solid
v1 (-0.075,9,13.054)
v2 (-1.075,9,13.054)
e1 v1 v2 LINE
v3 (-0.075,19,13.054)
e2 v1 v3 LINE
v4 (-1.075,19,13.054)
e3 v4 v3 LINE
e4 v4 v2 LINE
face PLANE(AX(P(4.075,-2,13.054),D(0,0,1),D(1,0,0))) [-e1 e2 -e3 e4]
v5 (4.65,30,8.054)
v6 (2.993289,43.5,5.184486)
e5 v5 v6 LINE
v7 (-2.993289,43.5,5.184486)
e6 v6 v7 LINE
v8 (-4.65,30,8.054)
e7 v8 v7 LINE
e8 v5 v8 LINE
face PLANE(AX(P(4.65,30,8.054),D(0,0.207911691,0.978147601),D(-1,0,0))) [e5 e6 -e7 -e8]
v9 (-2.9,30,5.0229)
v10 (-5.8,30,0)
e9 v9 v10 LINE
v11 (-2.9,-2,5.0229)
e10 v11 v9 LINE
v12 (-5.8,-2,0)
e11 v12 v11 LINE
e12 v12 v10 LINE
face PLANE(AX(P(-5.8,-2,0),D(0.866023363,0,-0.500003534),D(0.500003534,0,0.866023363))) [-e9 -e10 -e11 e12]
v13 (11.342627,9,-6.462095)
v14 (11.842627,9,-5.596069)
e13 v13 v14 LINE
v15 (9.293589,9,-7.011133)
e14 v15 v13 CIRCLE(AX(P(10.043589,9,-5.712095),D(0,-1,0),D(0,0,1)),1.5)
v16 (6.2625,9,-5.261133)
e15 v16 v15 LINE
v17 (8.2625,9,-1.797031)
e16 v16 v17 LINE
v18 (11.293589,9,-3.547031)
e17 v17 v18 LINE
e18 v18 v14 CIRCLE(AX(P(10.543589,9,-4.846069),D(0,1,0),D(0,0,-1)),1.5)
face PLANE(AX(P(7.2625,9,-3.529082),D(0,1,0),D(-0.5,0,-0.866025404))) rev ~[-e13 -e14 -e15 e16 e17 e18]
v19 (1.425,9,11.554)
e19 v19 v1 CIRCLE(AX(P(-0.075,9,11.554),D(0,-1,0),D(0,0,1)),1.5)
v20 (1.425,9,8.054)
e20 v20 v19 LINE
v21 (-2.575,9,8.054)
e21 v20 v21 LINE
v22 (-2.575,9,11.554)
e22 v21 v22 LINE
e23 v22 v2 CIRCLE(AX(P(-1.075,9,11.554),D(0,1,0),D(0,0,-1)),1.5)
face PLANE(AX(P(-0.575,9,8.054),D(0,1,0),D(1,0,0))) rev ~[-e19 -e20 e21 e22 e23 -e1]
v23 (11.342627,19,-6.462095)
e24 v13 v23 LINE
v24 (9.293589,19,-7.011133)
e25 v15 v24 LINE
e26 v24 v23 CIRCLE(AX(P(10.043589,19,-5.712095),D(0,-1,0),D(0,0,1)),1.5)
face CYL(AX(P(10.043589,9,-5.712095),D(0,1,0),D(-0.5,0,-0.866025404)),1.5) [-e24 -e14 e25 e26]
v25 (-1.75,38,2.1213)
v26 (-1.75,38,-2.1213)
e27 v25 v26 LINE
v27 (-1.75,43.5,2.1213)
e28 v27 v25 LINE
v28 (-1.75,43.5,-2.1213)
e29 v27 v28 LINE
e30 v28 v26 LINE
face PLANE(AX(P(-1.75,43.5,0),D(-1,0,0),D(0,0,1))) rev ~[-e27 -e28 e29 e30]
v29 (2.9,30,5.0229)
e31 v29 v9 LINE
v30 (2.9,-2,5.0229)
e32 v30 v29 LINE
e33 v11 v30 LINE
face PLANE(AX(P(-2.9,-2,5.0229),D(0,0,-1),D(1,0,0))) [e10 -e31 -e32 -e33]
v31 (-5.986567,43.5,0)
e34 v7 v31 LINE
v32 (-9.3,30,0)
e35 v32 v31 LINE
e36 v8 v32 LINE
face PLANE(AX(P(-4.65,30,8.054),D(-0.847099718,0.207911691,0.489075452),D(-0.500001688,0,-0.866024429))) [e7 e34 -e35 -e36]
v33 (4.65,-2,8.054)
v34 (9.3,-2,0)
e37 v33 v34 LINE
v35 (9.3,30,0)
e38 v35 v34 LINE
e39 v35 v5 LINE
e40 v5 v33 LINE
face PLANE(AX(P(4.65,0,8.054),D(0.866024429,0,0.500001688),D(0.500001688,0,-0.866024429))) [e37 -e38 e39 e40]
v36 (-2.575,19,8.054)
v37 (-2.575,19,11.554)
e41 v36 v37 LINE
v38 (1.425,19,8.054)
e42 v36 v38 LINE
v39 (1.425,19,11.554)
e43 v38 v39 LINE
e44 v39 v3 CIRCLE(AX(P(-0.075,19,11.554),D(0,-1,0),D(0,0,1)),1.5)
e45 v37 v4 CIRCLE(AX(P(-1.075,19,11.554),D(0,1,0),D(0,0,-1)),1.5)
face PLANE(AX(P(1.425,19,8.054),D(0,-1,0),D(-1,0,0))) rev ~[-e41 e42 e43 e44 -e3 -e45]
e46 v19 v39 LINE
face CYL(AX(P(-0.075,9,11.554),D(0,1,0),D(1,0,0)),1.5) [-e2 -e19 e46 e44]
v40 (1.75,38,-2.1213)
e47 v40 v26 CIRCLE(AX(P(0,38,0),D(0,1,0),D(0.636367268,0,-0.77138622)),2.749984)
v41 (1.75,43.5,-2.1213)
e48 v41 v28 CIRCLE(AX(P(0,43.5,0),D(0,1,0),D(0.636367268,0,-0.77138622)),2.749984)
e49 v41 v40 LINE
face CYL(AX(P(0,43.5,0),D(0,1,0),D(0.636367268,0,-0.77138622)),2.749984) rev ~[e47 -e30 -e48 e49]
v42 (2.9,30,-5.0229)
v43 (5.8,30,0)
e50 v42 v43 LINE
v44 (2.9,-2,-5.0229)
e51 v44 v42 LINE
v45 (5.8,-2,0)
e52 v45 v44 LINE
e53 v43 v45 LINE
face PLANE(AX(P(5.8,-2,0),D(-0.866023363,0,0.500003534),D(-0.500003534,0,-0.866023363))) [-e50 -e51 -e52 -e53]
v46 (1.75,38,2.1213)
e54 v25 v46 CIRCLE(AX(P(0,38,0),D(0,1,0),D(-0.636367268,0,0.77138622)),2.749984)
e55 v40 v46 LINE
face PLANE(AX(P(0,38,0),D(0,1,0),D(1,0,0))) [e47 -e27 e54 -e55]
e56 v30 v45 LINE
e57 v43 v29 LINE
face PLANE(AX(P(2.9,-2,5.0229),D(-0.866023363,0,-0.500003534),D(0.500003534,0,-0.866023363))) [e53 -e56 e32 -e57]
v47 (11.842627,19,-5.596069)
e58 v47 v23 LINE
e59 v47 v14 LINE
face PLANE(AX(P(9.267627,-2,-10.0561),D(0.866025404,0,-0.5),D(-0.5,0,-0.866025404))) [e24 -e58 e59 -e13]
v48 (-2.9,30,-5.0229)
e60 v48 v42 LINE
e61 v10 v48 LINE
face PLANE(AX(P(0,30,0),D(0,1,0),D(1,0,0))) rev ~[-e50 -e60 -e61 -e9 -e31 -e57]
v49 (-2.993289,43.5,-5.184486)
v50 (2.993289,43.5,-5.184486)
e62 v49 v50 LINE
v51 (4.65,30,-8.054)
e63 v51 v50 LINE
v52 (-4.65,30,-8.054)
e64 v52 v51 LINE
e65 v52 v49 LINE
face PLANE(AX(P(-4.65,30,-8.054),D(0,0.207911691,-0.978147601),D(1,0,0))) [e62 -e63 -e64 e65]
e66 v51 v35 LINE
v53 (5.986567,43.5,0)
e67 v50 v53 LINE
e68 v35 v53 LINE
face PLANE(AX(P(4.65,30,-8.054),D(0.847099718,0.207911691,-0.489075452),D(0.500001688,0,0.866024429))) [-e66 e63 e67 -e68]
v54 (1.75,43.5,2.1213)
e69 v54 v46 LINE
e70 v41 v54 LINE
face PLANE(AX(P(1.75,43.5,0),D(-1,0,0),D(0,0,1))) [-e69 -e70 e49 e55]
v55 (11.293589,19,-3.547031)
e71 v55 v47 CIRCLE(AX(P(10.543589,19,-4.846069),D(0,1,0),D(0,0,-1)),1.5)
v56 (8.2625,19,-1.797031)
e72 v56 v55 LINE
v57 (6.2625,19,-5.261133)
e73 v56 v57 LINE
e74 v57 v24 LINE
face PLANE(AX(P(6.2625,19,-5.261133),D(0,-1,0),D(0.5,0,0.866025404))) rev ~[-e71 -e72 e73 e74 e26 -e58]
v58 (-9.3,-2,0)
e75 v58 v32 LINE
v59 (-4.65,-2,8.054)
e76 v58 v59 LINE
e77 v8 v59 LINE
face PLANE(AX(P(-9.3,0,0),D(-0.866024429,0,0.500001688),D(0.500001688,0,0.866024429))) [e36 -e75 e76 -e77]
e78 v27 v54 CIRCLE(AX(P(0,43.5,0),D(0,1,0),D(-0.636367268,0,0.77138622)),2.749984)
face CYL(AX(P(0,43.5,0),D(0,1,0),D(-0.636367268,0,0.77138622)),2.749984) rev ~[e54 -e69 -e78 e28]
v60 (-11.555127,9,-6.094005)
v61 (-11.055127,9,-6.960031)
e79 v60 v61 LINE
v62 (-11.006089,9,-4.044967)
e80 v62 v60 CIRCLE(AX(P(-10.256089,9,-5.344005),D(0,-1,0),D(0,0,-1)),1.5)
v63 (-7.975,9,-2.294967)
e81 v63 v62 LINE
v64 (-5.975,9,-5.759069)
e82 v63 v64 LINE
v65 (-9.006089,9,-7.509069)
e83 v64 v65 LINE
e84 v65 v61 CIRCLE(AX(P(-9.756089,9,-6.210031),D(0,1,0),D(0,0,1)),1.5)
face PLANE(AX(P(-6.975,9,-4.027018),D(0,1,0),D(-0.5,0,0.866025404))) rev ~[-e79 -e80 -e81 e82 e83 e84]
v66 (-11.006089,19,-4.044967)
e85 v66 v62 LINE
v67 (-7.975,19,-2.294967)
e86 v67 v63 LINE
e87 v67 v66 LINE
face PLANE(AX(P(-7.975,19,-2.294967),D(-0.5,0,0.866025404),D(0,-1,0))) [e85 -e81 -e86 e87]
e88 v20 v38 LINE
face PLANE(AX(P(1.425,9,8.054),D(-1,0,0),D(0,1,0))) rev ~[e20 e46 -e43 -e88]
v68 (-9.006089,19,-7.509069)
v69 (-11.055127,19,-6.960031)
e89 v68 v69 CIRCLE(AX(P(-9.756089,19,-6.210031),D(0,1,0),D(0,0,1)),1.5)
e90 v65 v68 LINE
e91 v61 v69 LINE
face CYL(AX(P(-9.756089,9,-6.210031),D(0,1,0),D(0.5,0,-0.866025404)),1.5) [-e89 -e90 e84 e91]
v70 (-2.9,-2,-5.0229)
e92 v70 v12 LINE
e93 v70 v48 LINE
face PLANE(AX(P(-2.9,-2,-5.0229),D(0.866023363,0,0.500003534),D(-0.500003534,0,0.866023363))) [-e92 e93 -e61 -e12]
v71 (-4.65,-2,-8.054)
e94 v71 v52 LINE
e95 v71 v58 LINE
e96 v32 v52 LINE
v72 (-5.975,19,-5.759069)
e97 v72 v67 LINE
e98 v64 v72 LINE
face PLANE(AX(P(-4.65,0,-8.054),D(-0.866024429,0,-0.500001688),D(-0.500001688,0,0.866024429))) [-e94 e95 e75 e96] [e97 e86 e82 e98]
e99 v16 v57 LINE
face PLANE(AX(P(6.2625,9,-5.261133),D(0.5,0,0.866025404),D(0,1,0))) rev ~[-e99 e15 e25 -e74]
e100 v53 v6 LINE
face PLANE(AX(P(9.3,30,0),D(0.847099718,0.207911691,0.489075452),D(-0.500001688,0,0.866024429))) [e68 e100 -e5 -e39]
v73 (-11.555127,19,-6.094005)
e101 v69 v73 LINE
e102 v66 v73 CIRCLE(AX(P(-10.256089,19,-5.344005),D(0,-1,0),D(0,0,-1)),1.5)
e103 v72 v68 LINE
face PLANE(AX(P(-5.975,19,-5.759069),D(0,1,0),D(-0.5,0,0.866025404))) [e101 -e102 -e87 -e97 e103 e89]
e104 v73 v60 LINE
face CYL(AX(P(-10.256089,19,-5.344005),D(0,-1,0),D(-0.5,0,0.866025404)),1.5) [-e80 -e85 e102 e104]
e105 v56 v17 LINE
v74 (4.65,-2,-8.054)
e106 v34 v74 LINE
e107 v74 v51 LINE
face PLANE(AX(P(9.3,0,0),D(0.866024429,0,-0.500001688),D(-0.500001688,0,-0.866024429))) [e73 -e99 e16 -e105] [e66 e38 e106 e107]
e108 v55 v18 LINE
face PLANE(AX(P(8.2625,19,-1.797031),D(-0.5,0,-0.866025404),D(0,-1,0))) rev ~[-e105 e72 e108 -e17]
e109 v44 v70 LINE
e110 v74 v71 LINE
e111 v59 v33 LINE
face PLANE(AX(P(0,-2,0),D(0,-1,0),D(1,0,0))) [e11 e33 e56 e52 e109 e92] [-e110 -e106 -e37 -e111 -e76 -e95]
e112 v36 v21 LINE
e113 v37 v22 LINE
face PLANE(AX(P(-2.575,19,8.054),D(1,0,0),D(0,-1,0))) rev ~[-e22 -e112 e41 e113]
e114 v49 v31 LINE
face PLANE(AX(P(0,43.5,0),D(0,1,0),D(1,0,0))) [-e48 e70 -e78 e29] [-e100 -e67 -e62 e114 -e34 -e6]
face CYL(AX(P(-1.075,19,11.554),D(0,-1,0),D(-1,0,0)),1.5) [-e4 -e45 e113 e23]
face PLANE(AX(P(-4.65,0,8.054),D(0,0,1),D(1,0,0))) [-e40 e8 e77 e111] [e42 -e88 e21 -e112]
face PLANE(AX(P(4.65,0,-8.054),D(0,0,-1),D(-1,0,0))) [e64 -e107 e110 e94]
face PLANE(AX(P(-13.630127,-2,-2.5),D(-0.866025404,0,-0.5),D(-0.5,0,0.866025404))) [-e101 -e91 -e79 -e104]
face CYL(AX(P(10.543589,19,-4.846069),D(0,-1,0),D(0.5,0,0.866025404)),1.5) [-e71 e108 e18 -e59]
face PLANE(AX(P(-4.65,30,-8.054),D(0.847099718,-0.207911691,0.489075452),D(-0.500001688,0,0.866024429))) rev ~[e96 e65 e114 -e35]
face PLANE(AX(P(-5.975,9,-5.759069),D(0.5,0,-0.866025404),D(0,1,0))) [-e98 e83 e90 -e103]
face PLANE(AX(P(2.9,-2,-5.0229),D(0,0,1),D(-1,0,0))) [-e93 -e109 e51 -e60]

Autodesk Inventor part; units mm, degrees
ref_plane "YZ Plane" through (0, 0, 0) normal (1, 0, 0) x (0, 1, 0)
ref_plane "XZ Plane" through (0, 0, 0) normal (0, 1, 0) x (-1, 0, 0)
ref_plane "XY Plane" through (0, 0, 0) normal (0, 0, 1) x (1, 0, 0)
sketch "Boceto1" plane through (0, 0, 0) normal (0, 1, 0) x (-1, 0, 0)
  line L0 (0, 0) -> (5.8, 0)
  line L1 (5.8, 0) -> (9.3, 0)
  line L2 (5.8, 0) -> (2.9, -5.0229)
  line L3 (2.9, -5.0229) -> (-2.9, -5.0229)
  line L4 (-2.9, -5.0229) -> (-5.8, 0)
  line L5 (-5.8, 0) -> (-2.9, 5.0229)
  line L6 (-2.9, 5.0229) -> (2.9, 5.0229)
  line L7 (2.9, 5.0229) -> (5.8, 0)
  line L8 (9.3, 0) -> (4.65, -8.054)
  line L9 (4.65, -8.054) -> (-4.65, -8.054)
  line L10 (-4.65, -8.054) -> (-9.3, 0)
  line L11 (-9.3, 0) -> (-4.65, 8.054)
  line L12 (-4.65, 8.054) -> (4.65, 8.054)
  line L13 (4.65, 8.054) -> (9.3, 0)
  dimension "d0" = 5.8
  dimension "d1" = 3.5
extrude "Extrusión1" add sketch "Boceto1" along normal blind 30
sketch "Boceto2" plane through (0, 30, 0) normal (0, 1, 0) x (1, 0, 0)
  line L0 (-4.65, 8.054) -> (-9.3, 0) projected
  line L1 (-9.3, 0) -> (-4.65, 8.054)
  line L2 (-4.65, 8.054) -> (4.65, 8.054)
  line L3 (4.65, 8.054) -> (9.3, 0)
  line L4 (9.3, 0) -> (4.65, -8.054)
  line L5 (4.65, -8.054) -> (-4.65, -8.054)
  line L6 (-4.65, -8.054) -> (-9.3, 0)
  point P0 (0, 0)
  point P1 (0, 0)
extrude "Extrusión2" add sketch "Boceto2" along normal blind 13.5 draft -12
sketch "Boceto3" plane through (0, 0, 0) normal (0, -1, 0) x (1, 0, 0)
  line L0 (9.3, 0) -> (5.9866, 0) projected
  line L1 (9.3, 0) -> (4.65, -8.054)
  line L2 (4.65, -8.054) -> (-4.65, -8.054)
  line L3 (-4.65, -8.054) -> (-9.3, 0)
  line L4 (-9.3, 0) -> (-4.65, 8.054)
  line L5 (-4.65, 8.054) -> (4.65, 8.054)
  line L6 (4.65, 8.054) -> (9.3, 0)
  point P0 (0, 0)
  point P1 (0, 0)
sketch "Boceto4" plane through (0, 0, 0) normal (0, -1, 0) x (1, 0, 0)
  line L0 (5.8, 0) -> (2.9, -5.0229)
  line L1 (2.9, -5.0229) -> (-2.9, -5.0229)
  line L2 (-2.9, -5.0229) -> (-5.8, 0)
  line L3 (-5.8, 0) -> (-2.9, 5.0229)
  line L4 (-2.9, 5.0229) -> (2.9, 5.0229)
  line L5 (2.9, 5.0229) -> (5.8, 0)
  point P0 (0, 0)
  point P1 (0, 0)
extrude "Extrusión3" add sketch "Boceto3" along normal blind 2
sketch "Boceto5" plane through (0, -2, 0) normal (0, -1, 0) x (1, 0, 0)
  line L0 (0, 0) -> (5.8, 0)
  line L1 (5.8, 0) -> (2.9, -5.0229)
  line L2 (2.9, -5.0229) -> (-2.9, -5.0229)
  line L3 (-2.9, -5.0229) -> (-5.8, 0)
  line L4 (-5.8, 0) -> (-2.9, 5.0229)
  line L5 (-2.9, 5.0229) -> (2.9, 5.0229)
  line L6 (2.9, 5.0229) -> (5.8, 0)
  dimension "d8" = 5.8
extrude "Extrusión4" cut sketch "Boceto5" against normal blind 2
sketch "Boceto6" plane through (0, 43.5, 0) normal (0, 1, 0) x (1, 0, 0)
  line L0 (-1.75, 0) -> (-1.75, 2.1213)
  line L1 (-1.75, 0) -> (-1.75, -2.1213)
  line L2 (1.75, 0) -> (1.75, 2.1213)
  line L3 (1.75, 0) -> (1.75, -2.1213)
  arc A0 (-1.75, -2.1213) -> (1.75, -2.1213) centre (0, 0) ccw
  arc A1 (1.75, 2.1213) -> (-1.75, 2.1213) centre (0, 0) ccw
extrude "Extrusión5" cut sketch "Boceto6" against normal blind 5.5
sketch "Boceto8" plane through (-9.3, -2, 0) normal (-0.8660254, 0, -0.5) x (-0.5, 0, 0.8660254)
  line L0 (-4.65, 11) -> (-2.65, 11)
  line L1 (-4.65, 11) -> (-6.65, 11)
  line L2 (-6.65, 21) -> (-2.65, 21)
  line L3 (-2.65, 21) -> (-2.65, 11)
  line L4 (-6.65, 11) -> (-6.65, 21)
extrude "Extrusión7" add sketch "Boceto8" along normal blind 5
fillet "Empalme2" radius 1.5 2 edges at (-12.3051, 14, -4.795) (-10.3051, 14, -8.2591)
sketch "Boceto9" plane through (4.075, -2, 8.054) normal (0, 0, 1) x (1, 0, 0)
  line L0 (0, 0) -> (0, 32)
  line L1 (0, 0) -> (0, 16)
  line L2 (-1.75, 32) -> (1.15, 32)
  line L3 (-9.3, 32) -> (-9.3, 0)
  line L4 (-4.65, 11) -> (-6.65, 11)
  line L5 (-6.65, 11) -> (-2.65, 11)
  line L6 (-2.65, 11) -> (-2.65, 21)
  line L7 (-2.65, 21) -> (-4.65, 21)
  line L8 (-4.65, 21) -> (-6.65, 21)
  line L9 (-6.65, 21) -> (-6.65, 11)
  point P0 (-4.65, 2)
extrude "Extrusión8" add sketch "Boceto9" along normal blind 5
sketch "Boceto10" plane through (4.9375, -2, -7.5561) normal (0.8660254, 0, -0.5) x (-0.5, 0, -0.8660254)
  line L0 (0, 0) -> (0, 32)
  line L1 (0, 0) -> (0, 16)
  line L2 (-1.75, 32) -> (1.15, 32)
  line L3 (-9.3, 32) -> (-9.3, 0)
  line L4 (-4.65, 11) -> (-6.65, 11)
  line L5 (-6.65, 11) -> (-2.65, 11)
  line L6 (-2.65, 11) -> (-2.65, 21)
  line L7 (-2.65, 21) -> (-4.65, 21)
  line L8 (-4.65, 21) -> (-6.65, 21)
  line L9 (-6.65, 21) -> (-6.65, 11)
  point P0 (-4.65, 2)
extrude "Extrusión9" add sketch "Boceto10" along normal blind 5
fillet "Empalme3" radius 1.5 4 edges at (-2.575, 14, 13.054) (1.425, 14, 13.054) (12.5926, 14, -4.297) (10.5926, 14, -7.7611)
properties part number "acopladorV4"
